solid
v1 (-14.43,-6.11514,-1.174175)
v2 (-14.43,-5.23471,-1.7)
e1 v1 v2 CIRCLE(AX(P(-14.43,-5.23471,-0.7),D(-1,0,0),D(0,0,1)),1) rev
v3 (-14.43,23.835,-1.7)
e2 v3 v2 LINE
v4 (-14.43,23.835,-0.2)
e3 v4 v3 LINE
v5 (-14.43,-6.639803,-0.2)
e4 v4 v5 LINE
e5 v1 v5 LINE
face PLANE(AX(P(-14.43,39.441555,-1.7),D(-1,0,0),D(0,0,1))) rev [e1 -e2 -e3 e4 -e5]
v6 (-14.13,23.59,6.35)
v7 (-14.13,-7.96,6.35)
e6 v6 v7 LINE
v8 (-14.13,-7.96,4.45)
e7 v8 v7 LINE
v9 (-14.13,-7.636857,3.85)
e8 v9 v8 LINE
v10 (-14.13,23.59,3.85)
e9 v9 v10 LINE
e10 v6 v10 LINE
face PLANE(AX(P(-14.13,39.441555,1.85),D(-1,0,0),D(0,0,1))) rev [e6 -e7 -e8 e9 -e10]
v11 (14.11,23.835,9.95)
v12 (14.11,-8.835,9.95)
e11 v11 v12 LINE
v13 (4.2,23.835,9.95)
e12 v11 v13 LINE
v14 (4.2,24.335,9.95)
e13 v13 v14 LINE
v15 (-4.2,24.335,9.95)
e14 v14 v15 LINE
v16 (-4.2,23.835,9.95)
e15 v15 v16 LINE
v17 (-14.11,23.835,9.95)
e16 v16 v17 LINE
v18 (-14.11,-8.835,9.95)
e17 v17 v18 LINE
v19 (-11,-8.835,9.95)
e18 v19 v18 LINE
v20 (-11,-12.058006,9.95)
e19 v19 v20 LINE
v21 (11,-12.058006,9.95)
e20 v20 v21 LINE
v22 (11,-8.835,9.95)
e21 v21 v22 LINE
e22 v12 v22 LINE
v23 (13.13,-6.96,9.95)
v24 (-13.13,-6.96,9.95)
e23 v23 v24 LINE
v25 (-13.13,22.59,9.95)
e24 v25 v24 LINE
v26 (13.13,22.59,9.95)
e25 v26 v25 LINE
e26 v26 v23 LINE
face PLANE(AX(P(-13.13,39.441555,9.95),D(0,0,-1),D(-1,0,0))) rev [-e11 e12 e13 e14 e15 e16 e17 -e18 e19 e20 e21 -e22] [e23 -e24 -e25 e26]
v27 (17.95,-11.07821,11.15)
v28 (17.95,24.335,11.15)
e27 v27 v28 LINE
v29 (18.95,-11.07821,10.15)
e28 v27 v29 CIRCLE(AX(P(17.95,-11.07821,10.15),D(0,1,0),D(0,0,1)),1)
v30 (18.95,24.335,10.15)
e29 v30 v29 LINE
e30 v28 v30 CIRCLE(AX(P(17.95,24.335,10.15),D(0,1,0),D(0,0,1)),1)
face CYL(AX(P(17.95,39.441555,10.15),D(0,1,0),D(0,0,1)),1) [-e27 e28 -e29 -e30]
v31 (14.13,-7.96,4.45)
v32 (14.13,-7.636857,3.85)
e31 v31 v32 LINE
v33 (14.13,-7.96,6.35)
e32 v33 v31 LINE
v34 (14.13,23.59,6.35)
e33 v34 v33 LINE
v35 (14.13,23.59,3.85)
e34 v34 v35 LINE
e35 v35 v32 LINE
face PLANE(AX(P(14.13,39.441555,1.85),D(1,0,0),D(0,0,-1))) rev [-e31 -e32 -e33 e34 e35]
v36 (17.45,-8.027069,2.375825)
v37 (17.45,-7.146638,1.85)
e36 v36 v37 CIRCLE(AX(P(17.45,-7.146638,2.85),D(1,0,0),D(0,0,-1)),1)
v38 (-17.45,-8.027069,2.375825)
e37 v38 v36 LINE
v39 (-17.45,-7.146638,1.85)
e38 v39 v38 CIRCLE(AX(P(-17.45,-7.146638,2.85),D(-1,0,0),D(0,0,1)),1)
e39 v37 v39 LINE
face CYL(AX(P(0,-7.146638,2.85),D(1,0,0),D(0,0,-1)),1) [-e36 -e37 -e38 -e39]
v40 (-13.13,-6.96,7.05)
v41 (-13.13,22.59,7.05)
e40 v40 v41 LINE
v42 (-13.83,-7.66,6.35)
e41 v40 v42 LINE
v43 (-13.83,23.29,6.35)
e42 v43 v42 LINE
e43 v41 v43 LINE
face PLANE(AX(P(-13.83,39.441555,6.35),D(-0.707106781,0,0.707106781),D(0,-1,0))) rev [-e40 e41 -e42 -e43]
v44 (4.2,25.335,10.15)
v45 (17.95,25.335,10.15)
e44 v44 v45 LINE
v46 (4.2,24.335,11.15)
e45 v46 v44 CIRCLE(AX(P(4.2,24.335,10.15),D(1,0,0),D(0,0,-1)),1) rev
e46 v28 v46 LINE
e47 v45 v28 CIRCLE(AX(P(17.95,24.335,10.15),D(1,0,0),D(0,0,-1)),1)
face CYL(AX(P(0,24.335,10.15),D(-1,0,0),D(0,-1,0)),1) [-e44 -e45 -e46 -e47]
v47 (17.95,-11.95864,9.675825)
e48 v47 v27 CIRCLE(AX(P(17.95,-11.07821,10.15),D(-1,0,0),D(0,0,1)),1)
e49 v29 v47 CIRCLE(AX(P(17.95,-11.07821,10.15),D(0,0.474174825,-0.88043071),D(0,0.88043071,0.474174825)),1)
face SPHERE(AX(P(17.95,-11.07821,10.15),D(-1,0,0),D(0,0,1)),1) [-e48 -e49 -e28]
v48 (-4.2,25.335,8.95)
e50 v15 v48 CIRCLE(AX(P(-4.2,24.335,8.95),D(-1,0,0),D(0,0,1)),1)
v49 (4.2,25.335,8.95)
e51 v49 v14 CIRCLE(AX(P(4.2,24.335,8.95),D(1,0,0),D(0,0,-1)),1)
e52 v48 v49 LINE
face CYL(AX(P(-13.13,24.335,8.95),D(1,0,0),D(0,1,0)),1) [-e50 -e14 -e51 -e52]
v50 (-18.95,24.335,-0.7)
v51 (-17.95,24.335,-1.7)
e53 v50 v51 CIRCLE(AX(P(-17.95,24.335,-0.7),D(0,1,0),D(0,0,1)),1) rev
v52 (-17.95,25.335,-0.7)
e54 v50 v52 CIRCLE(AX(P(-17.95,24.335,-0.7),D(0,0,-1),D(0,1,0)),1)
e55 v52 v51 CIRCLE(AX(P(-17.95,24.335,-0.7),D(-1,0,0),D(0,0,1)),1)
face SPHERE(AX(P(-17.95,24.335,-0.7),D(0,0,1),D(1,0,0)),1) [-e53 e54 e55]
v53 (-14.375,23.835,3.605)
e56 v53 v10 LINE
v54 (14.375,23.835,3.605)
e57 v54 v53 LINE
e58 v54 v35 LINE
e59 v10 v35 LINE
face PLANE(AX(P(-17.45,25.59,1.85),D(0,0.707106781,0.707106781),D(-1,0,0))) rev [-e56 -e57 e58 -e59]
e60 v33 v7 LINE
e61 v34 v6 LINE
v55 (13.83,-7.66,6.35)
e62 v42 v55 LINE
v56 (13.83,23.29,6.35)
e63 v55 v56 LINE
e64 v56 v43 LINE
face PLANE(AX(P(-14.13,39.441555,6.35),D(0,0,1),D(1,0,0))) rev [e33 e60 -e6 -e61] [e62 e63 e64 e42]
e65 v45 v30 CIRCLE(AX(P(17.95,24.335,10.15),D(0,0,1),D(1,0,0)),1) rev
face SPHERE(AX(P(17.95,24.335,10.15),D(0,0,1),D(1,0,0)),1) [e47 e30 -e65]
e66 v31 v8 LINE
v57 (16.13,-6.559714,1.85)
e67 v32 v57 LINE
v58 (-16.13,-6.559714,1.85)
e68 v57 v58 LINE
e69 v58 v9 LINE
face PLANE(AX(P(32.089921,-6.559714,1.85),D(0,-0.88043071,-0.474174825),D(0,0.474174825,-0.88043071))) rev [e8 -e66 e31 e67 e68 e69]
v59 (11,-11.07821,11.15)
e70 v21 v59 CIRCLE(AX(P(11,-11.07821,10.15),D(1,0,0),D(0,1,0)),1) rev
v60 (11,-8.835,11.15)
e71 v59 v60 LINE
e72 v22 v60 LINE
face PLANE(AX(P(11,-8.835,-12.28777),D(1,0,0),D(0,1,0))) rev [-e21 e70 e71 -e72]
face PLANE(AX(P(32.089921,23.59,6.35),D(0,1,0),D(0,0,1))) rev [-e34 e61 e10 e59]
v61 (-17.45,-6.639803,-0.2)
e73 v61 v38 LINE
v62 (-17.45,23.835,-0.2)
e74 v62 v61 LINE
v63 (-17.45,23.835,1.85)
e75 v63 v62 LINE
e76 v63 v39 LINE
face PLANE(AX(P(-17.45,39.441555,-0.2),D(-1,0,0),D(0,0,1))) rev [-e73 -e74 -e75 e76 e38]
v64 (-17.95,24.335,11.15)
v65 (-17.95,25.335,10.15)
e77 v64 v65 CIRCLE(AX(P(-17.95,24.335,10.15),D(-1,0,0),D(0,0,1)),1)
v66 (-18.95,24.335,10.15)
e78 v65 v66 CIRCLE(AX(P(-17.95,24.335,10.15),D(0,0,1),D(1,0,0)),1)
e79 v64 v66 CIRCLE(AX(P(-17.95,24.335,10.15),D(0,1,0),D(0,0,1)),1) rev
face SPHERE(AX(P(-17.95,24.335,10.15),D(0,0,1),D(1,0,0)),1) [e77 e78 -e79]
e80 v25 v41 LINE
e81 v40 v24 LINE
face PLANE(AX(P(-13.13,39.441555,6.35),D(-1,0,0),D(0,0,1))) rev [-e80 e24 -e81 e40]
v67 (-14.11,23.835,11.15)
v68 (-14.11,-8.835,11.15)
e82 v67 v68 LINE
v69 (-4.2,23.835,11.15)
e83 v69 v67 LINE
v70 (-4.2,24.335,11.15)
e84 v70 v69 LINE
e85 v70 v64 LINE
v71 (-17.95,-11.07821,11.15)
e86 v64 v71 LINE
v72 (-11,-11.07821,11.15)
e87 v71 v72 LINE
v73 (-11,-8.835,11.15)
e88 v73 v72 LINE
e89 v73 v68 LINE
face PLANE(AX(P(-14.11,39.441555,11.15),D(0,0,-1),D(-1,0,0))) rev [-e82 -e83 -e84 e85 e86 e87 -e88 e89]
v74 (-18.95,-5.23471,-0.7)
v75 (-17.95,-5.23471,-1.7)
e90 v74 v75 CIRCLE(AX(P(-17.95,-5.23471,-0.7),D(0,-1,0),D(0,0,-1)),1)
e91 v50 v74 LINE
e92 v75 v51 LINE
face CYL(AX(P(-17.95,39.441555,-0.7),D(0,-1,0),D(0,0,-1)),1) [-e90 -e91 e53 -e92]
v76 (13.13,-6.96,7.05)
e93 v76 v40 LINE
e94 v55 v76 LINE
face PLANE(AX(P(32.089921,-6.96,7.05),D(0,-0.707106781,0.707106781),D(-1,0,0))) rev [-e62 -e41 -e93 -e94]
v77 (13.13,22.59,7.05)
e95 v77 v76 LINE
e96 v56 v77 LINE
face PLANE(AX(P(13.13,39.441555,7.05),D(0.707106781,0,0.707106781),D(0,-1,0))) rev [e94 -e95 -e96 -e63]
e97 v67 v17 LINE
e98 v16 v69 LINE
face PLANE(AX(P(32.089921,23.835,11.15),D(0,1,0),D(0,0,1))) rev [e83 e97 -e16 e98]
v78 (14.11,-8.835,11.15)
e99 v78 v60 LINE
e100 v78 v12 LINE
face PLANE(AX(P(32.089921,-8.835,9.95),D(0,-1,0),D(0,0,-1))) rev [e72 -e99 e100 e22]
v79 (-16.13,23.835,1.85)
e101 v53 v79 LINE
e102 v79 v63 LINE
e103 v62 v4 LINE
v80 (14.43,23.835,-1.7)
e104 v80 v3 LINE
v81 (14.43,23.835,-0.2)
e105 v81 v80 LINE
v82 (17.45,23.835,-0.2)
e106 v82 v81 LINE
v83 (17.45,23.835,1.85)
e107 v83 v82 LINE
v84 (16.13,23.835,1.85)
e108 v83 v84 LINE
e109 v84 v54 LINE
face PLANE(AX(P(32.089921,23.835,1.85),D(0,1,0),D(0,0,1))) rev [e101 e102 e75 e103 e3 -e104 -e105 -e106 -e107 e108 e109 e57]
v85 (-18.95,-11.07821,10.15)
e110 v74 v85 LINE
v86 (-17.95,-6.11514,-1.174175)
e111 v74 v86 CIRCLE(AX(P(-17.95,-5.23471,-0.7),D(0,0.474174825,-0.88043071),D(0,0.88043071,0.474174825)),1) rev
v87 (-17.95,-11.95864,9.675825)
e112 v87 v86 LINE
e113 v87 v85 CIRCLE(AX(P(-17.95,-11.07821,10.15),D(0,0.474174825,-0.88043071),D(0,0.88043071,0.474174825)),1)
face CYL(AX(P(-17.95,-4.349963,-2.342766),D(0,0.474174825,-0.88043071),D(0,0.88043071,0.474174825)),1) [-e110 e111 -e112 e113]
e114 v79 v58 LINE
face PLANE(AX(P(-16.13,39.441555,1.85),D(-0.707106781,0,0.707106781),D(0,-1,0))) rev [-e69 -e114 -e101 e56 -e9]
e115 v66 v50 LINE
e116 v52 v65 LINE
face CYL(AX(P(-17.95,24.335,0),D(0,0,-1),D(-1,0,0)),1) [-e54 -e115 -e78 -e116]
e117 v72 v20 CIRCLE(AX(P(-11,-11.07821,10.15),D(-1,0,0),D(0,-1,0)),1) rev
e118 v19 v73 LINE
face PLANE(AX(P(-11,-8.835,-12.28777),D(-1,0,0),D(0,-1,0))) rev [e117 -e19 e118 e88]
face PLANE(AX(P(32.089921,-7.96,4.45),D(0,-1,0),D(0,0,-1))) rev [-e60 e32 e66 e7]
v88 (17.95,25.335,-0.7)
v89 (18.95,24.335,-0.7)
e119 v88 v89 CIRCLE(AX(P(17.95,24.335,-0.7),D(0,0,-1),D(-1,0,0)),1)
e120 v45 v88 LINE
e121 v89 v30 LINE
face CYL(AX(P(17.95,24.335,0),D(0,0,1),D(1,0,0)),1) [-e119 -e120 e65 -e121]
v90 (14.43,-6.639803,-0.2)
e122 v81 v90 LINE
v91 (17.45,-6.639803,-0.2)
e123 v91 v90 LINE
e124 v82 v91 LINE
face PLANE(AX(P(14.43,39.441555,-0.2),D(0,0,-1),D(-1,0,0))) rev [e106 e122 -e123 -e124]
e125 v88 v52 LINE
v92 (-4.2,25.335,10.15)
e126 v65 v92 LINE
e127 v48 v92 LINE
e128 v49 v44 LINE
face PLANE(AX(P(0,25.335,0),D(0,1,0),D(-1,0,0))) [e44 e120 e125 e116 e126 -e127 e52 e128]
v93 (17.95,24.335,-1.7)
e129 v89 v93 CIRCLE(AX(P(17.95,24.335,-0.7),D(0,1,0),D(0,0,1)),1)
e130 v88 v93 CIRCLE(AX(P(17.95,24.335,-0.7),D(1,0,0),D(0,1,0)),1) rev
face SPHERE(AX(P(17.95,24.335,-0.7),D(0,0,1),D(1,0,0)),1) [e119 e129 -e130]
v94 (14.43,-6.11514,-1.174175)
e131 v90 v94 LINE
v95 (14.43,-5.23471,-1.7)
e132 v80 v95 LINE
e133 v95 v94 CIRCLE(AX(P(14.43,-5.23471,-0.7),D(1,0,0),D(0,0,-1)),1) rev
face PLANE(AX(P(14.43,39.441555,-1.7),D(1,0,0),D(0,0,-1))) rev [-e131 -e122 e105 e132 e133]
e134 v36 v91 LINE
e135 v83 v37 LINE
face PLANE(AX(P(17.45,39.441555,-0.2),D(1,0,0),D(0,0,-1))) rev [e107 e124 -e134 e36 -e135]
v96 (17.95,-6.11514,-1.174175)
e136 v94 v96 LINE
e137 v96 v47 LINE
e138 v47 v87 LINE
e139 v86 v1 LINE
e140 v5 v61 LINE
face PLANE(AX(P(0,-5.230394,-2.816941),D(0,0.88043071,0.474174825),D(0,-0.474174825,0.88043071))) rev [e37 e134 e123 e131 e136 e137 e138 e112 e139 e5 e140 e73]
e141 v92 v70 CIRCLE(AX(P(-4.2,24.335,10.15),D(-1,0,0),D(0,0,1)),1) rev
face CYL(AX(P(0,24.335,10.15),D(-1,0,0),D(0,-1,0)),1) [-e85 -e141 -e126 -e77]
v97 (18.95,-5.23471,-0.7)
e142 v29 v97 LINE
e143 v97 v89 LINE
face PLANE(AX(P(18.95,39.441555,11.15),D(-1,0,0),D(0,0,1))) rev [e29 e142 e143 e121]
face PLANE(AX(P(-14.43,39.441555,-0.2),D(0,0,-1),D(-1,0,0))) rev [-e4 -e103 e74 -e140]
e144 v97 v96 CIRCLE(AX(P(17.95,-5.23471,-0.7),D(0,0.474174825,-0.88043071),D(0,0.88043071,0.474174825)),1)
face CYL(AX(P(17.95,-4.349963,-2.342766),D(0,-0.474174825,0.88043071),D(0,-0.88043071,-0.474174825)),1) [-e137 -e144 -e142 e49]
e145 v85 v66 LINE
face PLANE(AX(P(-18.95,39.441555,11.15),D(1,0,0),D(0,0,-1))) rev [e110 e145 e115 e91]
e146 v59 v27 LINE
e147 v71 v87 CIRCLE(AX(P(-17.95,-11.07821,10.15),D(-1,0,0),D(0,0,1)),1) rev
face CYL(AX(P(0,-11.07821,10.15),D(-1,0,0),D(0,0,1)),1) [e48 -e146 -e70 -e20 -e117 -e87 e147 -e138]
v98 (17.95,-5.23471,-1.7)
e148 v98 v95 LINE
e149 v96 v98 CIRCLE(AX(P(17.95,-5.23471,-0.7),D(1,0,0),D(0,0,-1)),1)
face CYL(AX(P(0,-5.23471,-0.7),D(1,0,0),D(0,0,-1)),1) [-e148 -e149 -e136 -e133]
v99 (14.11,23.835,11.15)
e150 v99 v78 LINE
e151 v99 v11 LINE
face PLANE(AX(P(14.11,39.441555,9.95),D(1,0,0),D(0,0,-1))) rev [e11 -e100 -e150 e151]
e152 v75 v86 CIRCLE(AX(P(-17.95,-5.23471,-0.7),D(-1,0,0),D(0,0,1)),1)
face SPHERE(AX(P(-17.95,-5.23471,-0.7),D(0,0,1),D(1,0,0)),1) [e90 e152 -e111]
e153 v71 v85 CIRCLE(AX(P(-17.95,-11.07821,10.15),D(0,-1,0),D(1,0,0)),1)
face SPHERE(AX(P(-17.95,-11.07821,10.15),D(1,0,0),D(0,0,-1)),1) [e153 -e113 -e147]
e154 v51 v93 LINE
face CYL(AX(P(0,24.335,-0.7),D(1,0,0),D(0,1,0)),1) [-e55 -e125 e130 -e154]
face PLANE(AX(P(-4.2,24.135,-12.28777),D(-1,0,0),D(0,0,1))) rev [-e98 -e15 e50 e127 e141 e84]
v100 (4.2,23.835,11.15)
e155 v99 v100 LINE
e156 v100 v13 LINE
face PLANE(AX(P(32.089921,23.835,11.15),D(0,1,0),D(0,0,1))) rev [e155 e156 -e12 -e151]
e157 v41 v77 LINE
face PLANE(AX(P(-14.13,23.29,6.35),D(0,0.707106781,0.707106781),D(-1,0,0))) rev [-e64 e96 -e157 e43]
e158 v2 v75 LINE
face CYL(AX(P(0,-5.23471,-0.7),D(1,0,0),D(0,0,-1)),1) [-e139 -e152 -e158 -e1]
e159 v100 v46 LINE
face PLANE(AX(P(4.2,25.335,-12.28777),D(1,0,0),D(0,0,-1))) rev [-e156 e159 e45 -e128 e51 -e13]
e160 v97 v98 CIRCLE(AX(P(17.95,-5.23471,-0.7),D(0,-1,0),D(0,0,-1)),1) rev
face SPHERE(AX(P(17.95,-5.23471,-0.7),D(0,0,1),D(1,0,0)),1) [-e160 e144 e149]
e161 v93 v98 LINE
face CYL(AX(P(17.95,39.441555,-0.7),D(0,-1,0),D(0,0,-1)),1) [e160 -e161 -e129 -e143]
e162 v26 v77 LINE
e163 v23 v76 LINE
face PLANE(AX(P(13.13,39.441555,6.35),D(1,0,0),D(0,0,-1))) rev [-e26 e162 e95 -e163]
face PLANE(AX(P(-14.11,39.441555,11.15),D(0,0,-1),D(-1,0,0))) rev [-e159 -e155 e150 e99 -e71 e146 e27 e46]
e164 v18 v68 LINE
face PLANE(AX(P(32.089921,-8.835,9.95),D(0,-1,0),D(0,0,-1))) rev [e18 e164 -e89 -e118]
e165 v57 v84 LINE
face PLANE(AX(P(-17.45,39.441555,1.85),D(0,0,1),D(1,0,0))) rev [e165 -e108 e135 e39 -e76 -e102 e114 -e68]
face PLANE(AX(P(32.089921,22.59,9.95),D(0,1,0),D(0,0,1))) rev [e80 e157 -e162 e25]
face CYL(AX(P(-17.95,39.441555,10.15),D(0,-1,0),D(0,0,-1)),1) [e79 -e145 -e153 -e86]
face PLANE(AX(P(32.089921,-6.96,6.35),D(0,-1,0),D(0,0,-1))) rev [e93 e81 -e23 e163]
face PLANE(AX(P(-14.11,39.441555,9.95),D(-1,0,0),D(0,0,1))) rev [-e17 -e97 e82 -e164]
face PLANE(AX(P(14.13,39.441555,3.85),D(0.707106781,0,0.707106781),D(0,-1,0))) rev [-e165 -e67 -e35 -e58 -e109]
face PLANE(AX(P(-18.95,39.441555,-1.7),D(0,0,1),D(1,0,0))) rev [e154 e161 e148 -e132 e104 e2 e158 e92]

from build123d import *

# Parameters (mm, degrees)
BOSS_EXTRUDE1_START    = -18.95
BOSS_EXTRUDE1_DEPTH    = 4.52
BOSS_EXTRUDE1_START_2  = -14.43
BOSS_EXTRUDE1_2_DEPTH  = 1.3
BOSS_EXTRUDE1_3_DEPTH  = 1.5
BOSS_EXTRUDE1_4_DEPTH  = 0.3
BOSS_EXTRUDE1_START_3  = -14.13
BOSS_EXTRUDE1_5_DEPTH  = 0.02
BOSS_EXTRUDE1_START_4  = 14.43
BOSS_EXTRUDE1_6_DEPTH  = 4.52
BOSS_EXTRUDE1_START_5  = 13.13
BOSS_EXTRUDE1_7_DEPTH  = 1.3
BOSS_EXTRUDE1_START_6  = 17.45
BOSS_EXTRUDE1_8_DEPTH  = 1.5
BOSS_EXTRUDE1_START_7  = 14.13
BOSS_EXTRUDE1_9_DEPTH  = 0.3
BOSS_EXTRUDE1_START_8  = 14.11
BOSS_EXTRUDE1_10_DEPTH = 0.02
BOSS_EXTRUDE2_START    = -17.45
BOSS_EXTRUDE2_DEPTH    = 34.9
FILLET1_R              = 1
SKETCH5_W              = 22
SKETCH5_H              = 3.243209614
CUT_EXTRUDE1_DEPTH     = 1.2
CHAMFER1_SIZE          = 0.7
FILLET2_R              = 1


# Read off the part's stored shape, not the designer's step: Boss-Extrude1
with BuildPart() as part:
    # Boss-Extrude1 outline → Boss-Extrude1 (new body)
    with BuildSketch(Plane.YZ.offset(BOSS_EXTRUDE1_START)):
        Polygon((-5.831945908, -1.7), (25.335, -1.7), (25.335, -0.2), (-6.639803051, -0.2), align=None)
        Polygon((-7.74387448, 1.85), (25.335, 1.85), (25.335, 11.15), (-12.752588765, 11.15), align=None)
    extrude(amount=BOSS_EXTRUDE1_DEPTH)

    # Boss-Extrude1 2 outline → Boss-Extrude1 2 (add)
    with BuildSketch(Plane.YZ.offset(BOSS_EXTRUDE1_START_2)):
        Polygon((-10.167445908, 6.35), (25.335, 6.35), (25.335, 9.95), (-12.106303051, 9.95), align=None)
    extrude(amount=BOSS_EXTRUDE1_2_DEPTH)

    # Boss-Extrude1 3 outline → Boss-Extrude1 3 (add)
    with BuildSketch(Plane.YZ.offset(BOSS_EXTRUDE1_START)):
        Polygon((-6.639803051, -0.2), (25.335, -0.2), (25.335, 1.85), (-7.74387448, 1.85), align=None)
    extrude(amount=BOSS_EXTRUDE1_3_DEPTH)

    # Boss-Extrude1 4 outline → Boss-Extrude1 4 (add)
    with BuildSketch(Plane.YZ.offset(BOSS_EXTRUDE1_START_2)):
        Polygon((-7.74387448, 1.85), (25.335, 1.85), (25.335, 6.35), (-10.167445908, 6.35), align=None)
        Polygon((-12.106303051, 9.95), (25.335, 9.95), (25.335, 11.15), (-12.752588765, 11.15), align=None)
    extrude(amount=BOSS_EXTRUDE1_4_DEPTH)

    # Boss-Extrude1 5 outline → Boss-Extrude1 5 (add)
    with BuildSketch(Plane.YZ.offset(BOSS_EXTRUDE1_START_3)):
        Polygon((-12.106303051, 9.95), (25.335, 9.95), (25.335, 11.15), (-12.752588765, 11.15), align=None)
    extrude(amount=BOSS_EXTRUDE1_5_DEPTH)



with BuildPart() as body_2:
    # Boss-Extrude1 6 outline → Boss-Extrude1 6 (new body)
    with BuildSketch(Plane.YZ.offset(BOSS_EXTRUDE1_START_4)):
        Polygon((-5.831945908, -1.7), (25.335, -1.7), (25.335, -0.2), (-6.639803051, -0.2), align=None)
        Polygon((-7.74387448, 1.85), (25.335, 1.85), (25.335, 11.15), (-12.752588765, 11.15), align=None)
    extrude(amount=BOSS_EXTRUDE1_6_DEPTH)

    # Boss-Extrude1 7 outline → Boss-Extrude1 7 (add)
    with BuildSketch(Plane.YZ.offset(BOSS_EXTRUDE1_START_5)):
        Polygon((-10.167445908, 6.35), (25.335, 6.35), (25.335, 9.95), (-12.106303051, 9.95), align=None)
    extrude(amount=BOSS_EXTRUDE1_7_DEPTH)

    # Boss-Extrude1 8 outline → Boss-Extrude1 8 (add)
    with BuildSketch(Plane.YZ.offset(BOSS_EXTRUDE1_START_6)):
        Polygon((-6.639803051, -0.2), (25.335, -0.2), (25.335, 1.85), (-7.74387448, 1.85), align=None)
    extrude(amount=BOSS_EXTRUDE1_8_DEPTH)

    # Boss-Extrude1 9 outline → Boss-Extrude1 9 (add)
    with BuildSketch(Plane.YZ.offset(BOSS_EXTRUDE1_START_7)):
        Polygon((-7.74387448, 1.85), (25.335, 1.85), (25.335, 6.35), (-10.167445908, 6.35), align=None)
        Polygon((-12.106303051, 9.95), (25.335, 9.95), (25.335, 11.15), (-12.752588765, 11.15), align=None)
    extrude(amount=BOSS_EXTRUDE1_9_DEPTH)

    # Boss-Extrude1 10 outline → Boss-Extrude1 10 (add)
    with BuildSketch(Plane.YZ.offset(BOSS_EXTRUDE1_START_8)):
        Polygon((-12.106303051, 9.95), (25.335, 9.95), (25.335, 11.15), (-12.752588765, 11.15), align=None)
    extrude(amount=BOSS_EXTRUDE1_10_DEPTH)


with BuildPart() as part_1:
    add(part.part)

    add(body_2.part)  # Boss-Extrude2 merges body 2
    # Sketch4 → Boss-Extrude2 (add)
    with BuildSketch(Plane(origin=(0, 0, 0), x_dir=(0, 0, -1), z_dir=(1, 0, 0)).offset(BOSS_EXTRUDE2_START)):
        Polygon((1.7, 25.335), (-11.15, 25.335), (-11.15, 23.835), (-9.95, 23.835), (-9.95, 22.59), (-6.35, 22.59), (-6.35, 23.59), (-1.85, 23.59), (-1.85, 23.835), (1.7, 23.835), align=None)
        Polygon((-11.15, -8.835), (-11.15, -12.752588765), (-1.85, -7.74387448), (-1.85, -6.559714286), (-4.45, -7.96), (-6.35, -7.96), (-6.35, -6.96), (-9.95, -6.96), (-9.95, -8.835), align=None)
    extrude(amount=BOSS_EXTRUDE2_DEPTH)

    # Fillet1
    # the kernel refuses this fillet: 1 mm, written as the material it takes off along each edge
    with BuildSketch(Plane(origin=(-14.13, -7.74387448, 1.85), x_dir=(0, -0.47417482524162685, 0.8804307099977104), z_dir=(1, 0, 0))) as fillet1_piece_1:
        with BuildLine():
            CenterArc((FILLET1_R * 0.597236294449, -FILLET1_R), FILLET1_R, 90, 61.694363428)
            Line((-FILLET1_R * 0.283194415548, -FILLET1_R * 0.525825174758), (0, 0))
            Line((0, 0), (FILLET1_R * 0.597236294449, 0))
        make_face()
    extrude(amount=28.26, mode=Mode.SUBTRACT)
    with BuildSketch(Plane(origin=(-14.11, -12.752588765, 11.15), x_dir=(0, 0.47417482524162624, -0.8804307099977108), z_dir=(1, 0, 0))) as fillet1_piece_2:
        with BuildLine():
            CenterArc((FILLET1_R * 1.67437915159, FILLET1_R), FILLET1_R, 151.694363428, 118.305636572)
            Line((FILLET1_R * 0.793948441594, FILLET1_R * 1.47417482524), (0, 0))
            Line((0, 0), (FILLET1_R * 1.67437915159, 0))
        make_face()
    extrude(amount=28.22, mode=Mode.SUBTRACT)
    with BuildSketch(Plane(origin=(-14.43, -12.752588765, 11.15), x_dir=(0, 0.4741748250791318, -0.8804307100852257), z_dir=(1, 0, 0)), Plane(origin=(14.11, -12.752588765, 11.15), x_dir=(0, 0.4741748250791318, -0.8804307100852257), z_dir=(1, 0, 0))) as fillet1_piece_3:
        with BuildLine():
            CenterArc((FILLET1_R * 1.67437915124, FILLET1_R), FILLET1_R, 151.694363439, 118.305636561)
            Line((FILLET1_R * 0.793948441156, FILLET1_R * 1.47417482508), (0, 0))
            Line((0, 0), (FILLET1_R * 1.67437915124, 0))
        make_face()
    extrude(amount=0.32, mode=Mode.SUBTRACT)
    with BuildSketch(Plane(origin=(14.43, -12.752588765, 11.15), x_dir=(0, 0.4741748251892074, -0.8804307100259421), z_dir=(1, 0, 0)), Plane(origin=(-23.135947879, -12.752588765, 11.15), x_dir=(0, 0.4741748251892074, -0.8804307100259421), z_dir=(1, 0, 0))) as fillet1_piece_4:
        with BuildLine():
            CenterArc((FILLET1_R * 1.67437915148, FILLET1_R), FILLET1_R, 151.694363432, 118.305636568)
            Line((FILLET1_R * 0.793948441453, FILLET1_R * 1.47417482519), (0, 0))
            Line((0, 0), (FILLET1_R * 1.67437915148, 0))
        make_face()
    extrude(amount=8.705947879, mode=Mode.SUBTRACT)
    with BuildSketch(Plane(origin=(-14.43, -7.74387448, 1.85), x_dir=(0, -0.47417482515496245, 0.8804307100443854), z_dir=(1, 0, 0)), Plane(origin=(14.13, -7.74387448, 1.85), x_dir=(0, -0.47417482515496245, 0.8804307100443854), z_dir=(1, 0, 0))) as fillet1_piece_5:
        with BuildLine():
            CenterArc((FILLET1_R * 0.597236294516, -FILLET1_R), FILLET1_R, 90, 61.694363434)
            Line((-FILLET1_R * 0.283194415528, -FILLET1_R * 0.525825174845), (0, 0))
            Line((0, 0), (FILLET1_R * 0.597236294516, 0))
        make_face()
    extrude(amount=0.3, mode=Mode.SUBTRACT)
    with BuildSketch(Plane(origin=(14.43, -7.74387448, 1.85), x_dir=(0, 1, 0), z_dir=(1, 0, 0))) as fillet1_piece_6:
        with BuildLine():
            CenterArc((FILLET1_R * 0.59723629449, FILLET1_R), FILLET1_R, 208.305636568, 61.694363432)
            Line((-FILLET1_R * 0.283194415536, FILLET1_R * 0.525825174811), (0, 0))
            Line((0, 0), (FILLET1_R * 0.59723629449, 0))
        make_face()
    extrude(amount=3.02, mode=Mode.SUBTRACT)
    with BuildSketch(Plane(origin=(-17.45, -7.74387448, 1.85), x_dir=(0, -0.4741748251892074, 0.8804307100259422), z_dir=(1, 0, 0))) as fillet1_piece_7:
        with BuildLine():
            CenterArc((FILLET1_R * 0.59723629449, -FILLET1_R), FILLET1_R, 90, 61.694363432)
            Line((-FILLET1_R * 0.283194415536, -FILLET1_R * 0.525825174811), (0, 0))
            Line((0, 0), (FILLET1_R * 0.59723629449, 0))
        make_face()
    extrude(amount=3.02, mode=Mode.SUBTRACT)

    # Sketch5 → Cut-Extrude1 (cut)
    with BuildSketch(Plane.XY.offset(11.15)):
        Polygon((4.2, 23.635), (4.2, 24.135), (4.2, 25.335), (-4.2, 25.335), (-4.2, 24.135), (-4.2, 23.635), align=None)
        with Locations((0, -10.456604807)):
            Rectangle(SKETCH5_W, SKETCH5_H)
    extrude(amount=-CUT_EXTRUDE1_DEPTH, mode=Mode.SUBTRACT)

    # Chamfer1
    chamfer1_edges = [part_1.edges().sort_by_distance(p)[0] for p in [
        (0, 22.59, 6.35),
        (13.13, 7.815, 6.35),
        (0, -6.96, 6.35),
        (-13.13, 7.815, 6.35),
    ]]
    chamfer(chamfer1_edges, length=CHAMFER1_SIZE)

    # Chamfer2
    # the kernel refuses this chamfer: 2 mm, written as the material it takes off along each edge
    with BuildSketch(Plane(origin=(-14.13, 23.59, 1.85), x_dir=(0, -0.02749587661058563, 0.9996219169112968), z_dir=(1, 0, 0))) as chamfer2_piece_1_section:
        with BuildLine():
            Line((2.05734639, 0), (-0.11309431, -2.054235587))
            Line((-0.11309431, -2.054235587), (-0.153079186, -2.053135752))
            ThreePointArc((-0.153079186, -2.053135752), (-0.068258454, -1.026795659), (-0.039984877, 0.001099835))
            Line((-0.039984877, 0.001099835), (0.001099835, 0.039984877))
            ThreePointArc((0.001099835, 0.039984877), (1.028995329, 0.011711299), (2.058446225, 0.039984877))
            Line((2.058446225, 0.039984877), (2.05734639, 0))
        make_face()
    chamfer2_piece_1 = extrude(amount=28.26, mode=Mode.PRIVATE)
    chamfer2_piece_1 = split(chamfer2_piece_1, bisect_by=Plane(origin=(0, 23.835, 2.821035837), z_dir=(0, -1, 0)), keep=Keep.TOP, mode=Mode.PRIVATE)
    add(chamfer2_piece_1, mode=Mode.SUBTRACT)
    with BuildSketch(Plane(origin=(14.13, -11.703080262, 1.85), x_dir=(-0.027495876610586494, 0, 0.9996219169112968), z_dir=(0, 1, 0))) as chamfer2_piece_2_section:
        with BuildLine():
            Line((2.05734639, 0), (-0.11309431, 2.054235587))
            Line((-0.11309431, 2.054235587), (-0.153079186, 2.053135752))
            ThreePointArc((-0.153079186, 2.053135752), (-0.068258454, 1.026795659), (-0.039984877, -0.001099835))
            Line((-0.039984877, -0.001099835), (0.001099835, -0.039984877))
            ThreePointArc((0.001099835, -0.039984877), (1.028995329, -0.011711299), (2.058446225, -0.039984877))
            Line((2.058446225, -0.039984877), (2.05734639, 0))
        make_face()
    chamfer2_piece_2 = extrude(amount=35.293080262, mode=Mode.PRIVATE)
    chamfer2_piece_2 = split(chamfer2_piece_2, bisect_by=Plane(origin=(14.787189765, -3.487699586, -3.854006073), z_dir=(0, 0.880430709997711, 0.4741748252416259)), keep=Keep.TOP, mode=Mode.PRIVATE)
    add(chamfer2_piece_2, mode=Mode.SUBTRACT)
    with BuildSketch(Plane(origin=(-14.13, -11.703080262, 1.85), x_dir=(0.027495876610586494, 0, 0.9996219169112968), z_dir=(0, 1, 0))) as chamfer2_piece_3_section:
        with BuildLine():
            Line((2.05734639, 0), (-0.11309431, -2.054235587))
            Line((-0.11309431, -2.054235587), (-0.153079186, -2.053135752))
            ThreePointArc((-0.153079186, -2.053135752), (-0.068258454, -1.026795659), (-0.039984877, 0.001099835))
            Line((-0.039984877, 0.001099835), (0.001099835, 0.039984877))
            ThreePointArc((0.001099835, 0.039984877), (1.028995329, 0.011711299), (2.058446225, 0.039984877))
            Line((2.058446225, 0.039984877), (2.05734639, 0))
        make_face()
    chamfer2_piece_3 = extrude(amount=35.293080262, mode=Mode.PRIVATE)
    chamfer2_piece_3 = split(chamfer2_piece_3, bisect_by=Plane(origin=(-14.787189765, -3.487699586, -3.854006073), z_dir=(0, 0.880430709997711, 0.4741748252416259)), keep=Keep.TOP, mode=Mode.PRIVATE)
    add(chamfer2_piece_3, mode=Mode.SUBTRACT)
    with BuildSketch(Plane(origin=(-19.273365976, 23.59, 1.85), x_dir=(0, -0.02749587661058563, 0.9996219169112968), z_dir=(1, 0, 0))) as chamfer2_piece_4a_section:
        with BuildLine():
            Line((2.05734639, 0), (-0.11309431, -2.054235587))
            Line((-0.11309431, -2.054235587), (-0.153079186, -2.053135752))
            ThreePointArc((-0.153079186, -2.053135752), (-0.068258454, -1.026795659), (-0.039984877, 0.001099835))
            Line((-0.039984877, 0.001099835), (0.001099835, 0.039984877))
            ThreePointArc((0.001099835, 0.039984877), (1.028995329, 0.011711299), (2.058446225, 0.039984877))
            Line((2.058446225, 0.039984877), (2.05734639, 0))
        make_face()
    chamfer2_piece_4a = extrude(amount=33.403365976, mode=Mode.PRIVATE)
    chamfer2_piece_4a = split(chamfer2_piece_4a, bisect_by=Plane(origin=(-14.13, 23.683647422, 2.821035837), z_dir=(-1, 0, 0)), keep=Keep.TOP, mode=Mode.PRIVATE)
    chamfer2_piece_4a = split(chamfer2_piece_4a, bisect_by=Plane(origin=(-17.45, 23.683647422, 2.821035837), z_dir=(1, 0, 0)), keep=Keep.TOP, mode=Mode.PRIVATE)
    chamfer2_piece_4a = split(chamfer2_piece_4a, bisect_by=Plane(origin=(-15.79, 23.835, 2.821035837), z_dir=(0, -1, 0)), keep=Keep.TOP, mode=Mode.PRIVATE)
    with BuildSketch(Plane(origin=(-14.13, -11.703080262, 1.85), x_dir=(0.027495876610586494, 0, 0.9996219169112968), z_dir=(0, 1, 0))) as chamfer2_piece_4b_section:
        with BuildLine():
            Line((2.05734639, 0), (-0.11309431, -2.054235587))
            Line((-0.11309431, -2.054235587), (-0.153079186, -2.053135752))
            ThreePointArc((-0.153079186, -2.053135752), (-0.068258454, -1.026795659), (-0.039984877, 0.001099835))
            Line((-0.039984877, 0.001099835), (0.001099835, 0.039984877))
            ThreePointArc((0.001099835, 0.039984877), (1.028995329, 0.011711299), (2.058446225, 0.039984877))
            Line((2.058446225, 0.039984877), (2.05734639, 0))
        make_face()
    chamfer2_piece_4b = extrude(amount=40.436446238, mode=Mode.PRIVATE)
    chamfer2_piece_4b = split(chamfer2_piece_4b, bisect_by=Plane(origin=(-14.789587254, 23.59, 2.509587254), z_dir=(0, 1, 0)), keep=Keep.TOP, mode=Mode.PRIVATE)
    chamfer2_piece_4b = split(chamfer2_piece_4b, bisect_by=Plane(origin=(-14.789587254, 23.835, 2.509587254), z_dir=(0, -1, 0)), keep=Keep.TOP, mode=Mode.PRIVATE)
    chamfer2_piece_4 = chamfer2_piece_4a & chamfer2_piece_4b
    add(chamfer2_piece_4, mode=Mode.SUBTRACT)
    with BuildSketch(Plane(origin=(-14.13, 23.59, 1.85), x_dir=(0, -0.02749587661058563, 0.9996219169112968), z_dir=(1, 0, 0))) as chamfer2_piece_5a_section:
        with BuildLine():
            Line((2.05734639, 0), (-0.11309431, -2.054235587))
            Line((-0.11309431, -2.054235587), (-0.153079186, -2.053135752))
            ThreePointArc((-0.153079186, -2.053135752), (-0.068258454, -1.026795659), (-0.039984877, 0.001099835))
            Line((-0.039984877, 0.001099835), (0.001099835, 0.039984877))
            ThreePointArc((0.001099835, 0.039984877), (1.028995329, 0.011711299), (2.058446225, 0.039984877))
            Line((2.058446225, 0.039984877), (2.05734639, 0))
        make_face()
    chamfer2_piece_5a = extrude(amount=33.403365976, mode=Mode.PRIVATE)
    chamfer2_piece_5a = split(chamfer2_piece_5a, bisect_by=Plane(origin=(14.13, 23.683647422, 2.821035837), z_dir=(1, 0, 0)), keep=Keep.TOP, mode=Mode.PRIVATE)
    chamfer2_piece_5a = split(chamfer2_piece_5a, bisect_by=Plane(origin=(15.79, 23.835, 2.821035837), z_dir=(0, -1, 0)), keep=Keep.TOP, mode=Mode.PRIVATE)
    chamfer2_piece_5a = split(chamfer2_piece_5a, bisect_by=Plane(origin=(17.45, 23.683647422, 2.821035837), z_dir=(-1, 0, 0)), keep=Keep.TOP, mode=Mode.PRIVATE)
    with BuildSketch(Plane(origin=(14.13, -11.703080262, 1.85), x_dir=(-0.027495876610586494, 0, 0.9996219169112968), z_dir=(0, 1, 0))) as chamfer2_piece_5b_section:
        with BuildLine():
            Line((2.05734639, 0), (-0.11309431, 2.054235587))
            Line((-0.11309431, 2.054235587), (-0.153079186, 2.053135752))
            ThreePointArc((-0.153079186, 2.053135752), (-0.068258454, 1.026795659), (-0.039984877, -0.001099835))
            Line((-0.039984877, -0.001099835), (0.001099835, -0.039984877))
            ThreePointArc((0.001099835, -0.039984877), (1.028995329, -0.011711299), (2.058446225, -0.039984877))
            Line((2.058446225, -0.039984877), (2.05734639, 0))
        make_face()
    chamfer2_piece_5b = extrude(amount=40.436446238, mode=Mode.PRIVATE)
    chamfer2_piece_5b = split(chamfer2_piece_5b, bisect_by=Plane(origin=(14.789587254, 23.59, 2.509587254), z_dir=(0, 1, 0)), keep=Keep.TOP, mode=Mode.PRIVATE)
    chamfer2_piece_5b = split(chamfer2_piece_5b, bisect_by=Plane(origin=(14.789587254, 23.835, 2.509587254), z_dir=(0, -1, 0)), keep=Keep.TOP, mode=Mode.PRIVATE)
    chamfer2_piece_5 = chamfer2_piece_5a & chamfer2_piece_5b
    add(chamfer2_piece_5, mode=Mode.SUBTRACT)

    # Fillet2
    fillet2_edges = [part_1.edges().sort_by_distance(p)[0] for p in [
        (18.95, -9.851257402, 5.762912587),
        (16.69, -5.831945908, -1.7),
        (-18.95, 7.128395193, 11.15),
        (-18.95, -9.851257402, 5.762912587),
        (-18.95, -11.936747564, 10.662750024),
        (18.95, 7.128395193, 11.15),
        (18.95, -11.936747564, 10.662750024),
        (11.575, 25.335, 11.15),
        (-16.69, -5.831945908, -1.7),
        (0, 25.335, 9.95),
        (0, 25.335, -1.7),
        (-18.95, 25.335, 4.725),
        (-11.575, 25.335, 11.15),
        (18.95, 25.335, 4.725),
        (18.95, 9.751527046, -1.7),
        (-18.95, 9.751527046, -1.7),
    ]]
    fillet(fillet2_edges, radius=FILLET2_R)


solid = part_1.part
